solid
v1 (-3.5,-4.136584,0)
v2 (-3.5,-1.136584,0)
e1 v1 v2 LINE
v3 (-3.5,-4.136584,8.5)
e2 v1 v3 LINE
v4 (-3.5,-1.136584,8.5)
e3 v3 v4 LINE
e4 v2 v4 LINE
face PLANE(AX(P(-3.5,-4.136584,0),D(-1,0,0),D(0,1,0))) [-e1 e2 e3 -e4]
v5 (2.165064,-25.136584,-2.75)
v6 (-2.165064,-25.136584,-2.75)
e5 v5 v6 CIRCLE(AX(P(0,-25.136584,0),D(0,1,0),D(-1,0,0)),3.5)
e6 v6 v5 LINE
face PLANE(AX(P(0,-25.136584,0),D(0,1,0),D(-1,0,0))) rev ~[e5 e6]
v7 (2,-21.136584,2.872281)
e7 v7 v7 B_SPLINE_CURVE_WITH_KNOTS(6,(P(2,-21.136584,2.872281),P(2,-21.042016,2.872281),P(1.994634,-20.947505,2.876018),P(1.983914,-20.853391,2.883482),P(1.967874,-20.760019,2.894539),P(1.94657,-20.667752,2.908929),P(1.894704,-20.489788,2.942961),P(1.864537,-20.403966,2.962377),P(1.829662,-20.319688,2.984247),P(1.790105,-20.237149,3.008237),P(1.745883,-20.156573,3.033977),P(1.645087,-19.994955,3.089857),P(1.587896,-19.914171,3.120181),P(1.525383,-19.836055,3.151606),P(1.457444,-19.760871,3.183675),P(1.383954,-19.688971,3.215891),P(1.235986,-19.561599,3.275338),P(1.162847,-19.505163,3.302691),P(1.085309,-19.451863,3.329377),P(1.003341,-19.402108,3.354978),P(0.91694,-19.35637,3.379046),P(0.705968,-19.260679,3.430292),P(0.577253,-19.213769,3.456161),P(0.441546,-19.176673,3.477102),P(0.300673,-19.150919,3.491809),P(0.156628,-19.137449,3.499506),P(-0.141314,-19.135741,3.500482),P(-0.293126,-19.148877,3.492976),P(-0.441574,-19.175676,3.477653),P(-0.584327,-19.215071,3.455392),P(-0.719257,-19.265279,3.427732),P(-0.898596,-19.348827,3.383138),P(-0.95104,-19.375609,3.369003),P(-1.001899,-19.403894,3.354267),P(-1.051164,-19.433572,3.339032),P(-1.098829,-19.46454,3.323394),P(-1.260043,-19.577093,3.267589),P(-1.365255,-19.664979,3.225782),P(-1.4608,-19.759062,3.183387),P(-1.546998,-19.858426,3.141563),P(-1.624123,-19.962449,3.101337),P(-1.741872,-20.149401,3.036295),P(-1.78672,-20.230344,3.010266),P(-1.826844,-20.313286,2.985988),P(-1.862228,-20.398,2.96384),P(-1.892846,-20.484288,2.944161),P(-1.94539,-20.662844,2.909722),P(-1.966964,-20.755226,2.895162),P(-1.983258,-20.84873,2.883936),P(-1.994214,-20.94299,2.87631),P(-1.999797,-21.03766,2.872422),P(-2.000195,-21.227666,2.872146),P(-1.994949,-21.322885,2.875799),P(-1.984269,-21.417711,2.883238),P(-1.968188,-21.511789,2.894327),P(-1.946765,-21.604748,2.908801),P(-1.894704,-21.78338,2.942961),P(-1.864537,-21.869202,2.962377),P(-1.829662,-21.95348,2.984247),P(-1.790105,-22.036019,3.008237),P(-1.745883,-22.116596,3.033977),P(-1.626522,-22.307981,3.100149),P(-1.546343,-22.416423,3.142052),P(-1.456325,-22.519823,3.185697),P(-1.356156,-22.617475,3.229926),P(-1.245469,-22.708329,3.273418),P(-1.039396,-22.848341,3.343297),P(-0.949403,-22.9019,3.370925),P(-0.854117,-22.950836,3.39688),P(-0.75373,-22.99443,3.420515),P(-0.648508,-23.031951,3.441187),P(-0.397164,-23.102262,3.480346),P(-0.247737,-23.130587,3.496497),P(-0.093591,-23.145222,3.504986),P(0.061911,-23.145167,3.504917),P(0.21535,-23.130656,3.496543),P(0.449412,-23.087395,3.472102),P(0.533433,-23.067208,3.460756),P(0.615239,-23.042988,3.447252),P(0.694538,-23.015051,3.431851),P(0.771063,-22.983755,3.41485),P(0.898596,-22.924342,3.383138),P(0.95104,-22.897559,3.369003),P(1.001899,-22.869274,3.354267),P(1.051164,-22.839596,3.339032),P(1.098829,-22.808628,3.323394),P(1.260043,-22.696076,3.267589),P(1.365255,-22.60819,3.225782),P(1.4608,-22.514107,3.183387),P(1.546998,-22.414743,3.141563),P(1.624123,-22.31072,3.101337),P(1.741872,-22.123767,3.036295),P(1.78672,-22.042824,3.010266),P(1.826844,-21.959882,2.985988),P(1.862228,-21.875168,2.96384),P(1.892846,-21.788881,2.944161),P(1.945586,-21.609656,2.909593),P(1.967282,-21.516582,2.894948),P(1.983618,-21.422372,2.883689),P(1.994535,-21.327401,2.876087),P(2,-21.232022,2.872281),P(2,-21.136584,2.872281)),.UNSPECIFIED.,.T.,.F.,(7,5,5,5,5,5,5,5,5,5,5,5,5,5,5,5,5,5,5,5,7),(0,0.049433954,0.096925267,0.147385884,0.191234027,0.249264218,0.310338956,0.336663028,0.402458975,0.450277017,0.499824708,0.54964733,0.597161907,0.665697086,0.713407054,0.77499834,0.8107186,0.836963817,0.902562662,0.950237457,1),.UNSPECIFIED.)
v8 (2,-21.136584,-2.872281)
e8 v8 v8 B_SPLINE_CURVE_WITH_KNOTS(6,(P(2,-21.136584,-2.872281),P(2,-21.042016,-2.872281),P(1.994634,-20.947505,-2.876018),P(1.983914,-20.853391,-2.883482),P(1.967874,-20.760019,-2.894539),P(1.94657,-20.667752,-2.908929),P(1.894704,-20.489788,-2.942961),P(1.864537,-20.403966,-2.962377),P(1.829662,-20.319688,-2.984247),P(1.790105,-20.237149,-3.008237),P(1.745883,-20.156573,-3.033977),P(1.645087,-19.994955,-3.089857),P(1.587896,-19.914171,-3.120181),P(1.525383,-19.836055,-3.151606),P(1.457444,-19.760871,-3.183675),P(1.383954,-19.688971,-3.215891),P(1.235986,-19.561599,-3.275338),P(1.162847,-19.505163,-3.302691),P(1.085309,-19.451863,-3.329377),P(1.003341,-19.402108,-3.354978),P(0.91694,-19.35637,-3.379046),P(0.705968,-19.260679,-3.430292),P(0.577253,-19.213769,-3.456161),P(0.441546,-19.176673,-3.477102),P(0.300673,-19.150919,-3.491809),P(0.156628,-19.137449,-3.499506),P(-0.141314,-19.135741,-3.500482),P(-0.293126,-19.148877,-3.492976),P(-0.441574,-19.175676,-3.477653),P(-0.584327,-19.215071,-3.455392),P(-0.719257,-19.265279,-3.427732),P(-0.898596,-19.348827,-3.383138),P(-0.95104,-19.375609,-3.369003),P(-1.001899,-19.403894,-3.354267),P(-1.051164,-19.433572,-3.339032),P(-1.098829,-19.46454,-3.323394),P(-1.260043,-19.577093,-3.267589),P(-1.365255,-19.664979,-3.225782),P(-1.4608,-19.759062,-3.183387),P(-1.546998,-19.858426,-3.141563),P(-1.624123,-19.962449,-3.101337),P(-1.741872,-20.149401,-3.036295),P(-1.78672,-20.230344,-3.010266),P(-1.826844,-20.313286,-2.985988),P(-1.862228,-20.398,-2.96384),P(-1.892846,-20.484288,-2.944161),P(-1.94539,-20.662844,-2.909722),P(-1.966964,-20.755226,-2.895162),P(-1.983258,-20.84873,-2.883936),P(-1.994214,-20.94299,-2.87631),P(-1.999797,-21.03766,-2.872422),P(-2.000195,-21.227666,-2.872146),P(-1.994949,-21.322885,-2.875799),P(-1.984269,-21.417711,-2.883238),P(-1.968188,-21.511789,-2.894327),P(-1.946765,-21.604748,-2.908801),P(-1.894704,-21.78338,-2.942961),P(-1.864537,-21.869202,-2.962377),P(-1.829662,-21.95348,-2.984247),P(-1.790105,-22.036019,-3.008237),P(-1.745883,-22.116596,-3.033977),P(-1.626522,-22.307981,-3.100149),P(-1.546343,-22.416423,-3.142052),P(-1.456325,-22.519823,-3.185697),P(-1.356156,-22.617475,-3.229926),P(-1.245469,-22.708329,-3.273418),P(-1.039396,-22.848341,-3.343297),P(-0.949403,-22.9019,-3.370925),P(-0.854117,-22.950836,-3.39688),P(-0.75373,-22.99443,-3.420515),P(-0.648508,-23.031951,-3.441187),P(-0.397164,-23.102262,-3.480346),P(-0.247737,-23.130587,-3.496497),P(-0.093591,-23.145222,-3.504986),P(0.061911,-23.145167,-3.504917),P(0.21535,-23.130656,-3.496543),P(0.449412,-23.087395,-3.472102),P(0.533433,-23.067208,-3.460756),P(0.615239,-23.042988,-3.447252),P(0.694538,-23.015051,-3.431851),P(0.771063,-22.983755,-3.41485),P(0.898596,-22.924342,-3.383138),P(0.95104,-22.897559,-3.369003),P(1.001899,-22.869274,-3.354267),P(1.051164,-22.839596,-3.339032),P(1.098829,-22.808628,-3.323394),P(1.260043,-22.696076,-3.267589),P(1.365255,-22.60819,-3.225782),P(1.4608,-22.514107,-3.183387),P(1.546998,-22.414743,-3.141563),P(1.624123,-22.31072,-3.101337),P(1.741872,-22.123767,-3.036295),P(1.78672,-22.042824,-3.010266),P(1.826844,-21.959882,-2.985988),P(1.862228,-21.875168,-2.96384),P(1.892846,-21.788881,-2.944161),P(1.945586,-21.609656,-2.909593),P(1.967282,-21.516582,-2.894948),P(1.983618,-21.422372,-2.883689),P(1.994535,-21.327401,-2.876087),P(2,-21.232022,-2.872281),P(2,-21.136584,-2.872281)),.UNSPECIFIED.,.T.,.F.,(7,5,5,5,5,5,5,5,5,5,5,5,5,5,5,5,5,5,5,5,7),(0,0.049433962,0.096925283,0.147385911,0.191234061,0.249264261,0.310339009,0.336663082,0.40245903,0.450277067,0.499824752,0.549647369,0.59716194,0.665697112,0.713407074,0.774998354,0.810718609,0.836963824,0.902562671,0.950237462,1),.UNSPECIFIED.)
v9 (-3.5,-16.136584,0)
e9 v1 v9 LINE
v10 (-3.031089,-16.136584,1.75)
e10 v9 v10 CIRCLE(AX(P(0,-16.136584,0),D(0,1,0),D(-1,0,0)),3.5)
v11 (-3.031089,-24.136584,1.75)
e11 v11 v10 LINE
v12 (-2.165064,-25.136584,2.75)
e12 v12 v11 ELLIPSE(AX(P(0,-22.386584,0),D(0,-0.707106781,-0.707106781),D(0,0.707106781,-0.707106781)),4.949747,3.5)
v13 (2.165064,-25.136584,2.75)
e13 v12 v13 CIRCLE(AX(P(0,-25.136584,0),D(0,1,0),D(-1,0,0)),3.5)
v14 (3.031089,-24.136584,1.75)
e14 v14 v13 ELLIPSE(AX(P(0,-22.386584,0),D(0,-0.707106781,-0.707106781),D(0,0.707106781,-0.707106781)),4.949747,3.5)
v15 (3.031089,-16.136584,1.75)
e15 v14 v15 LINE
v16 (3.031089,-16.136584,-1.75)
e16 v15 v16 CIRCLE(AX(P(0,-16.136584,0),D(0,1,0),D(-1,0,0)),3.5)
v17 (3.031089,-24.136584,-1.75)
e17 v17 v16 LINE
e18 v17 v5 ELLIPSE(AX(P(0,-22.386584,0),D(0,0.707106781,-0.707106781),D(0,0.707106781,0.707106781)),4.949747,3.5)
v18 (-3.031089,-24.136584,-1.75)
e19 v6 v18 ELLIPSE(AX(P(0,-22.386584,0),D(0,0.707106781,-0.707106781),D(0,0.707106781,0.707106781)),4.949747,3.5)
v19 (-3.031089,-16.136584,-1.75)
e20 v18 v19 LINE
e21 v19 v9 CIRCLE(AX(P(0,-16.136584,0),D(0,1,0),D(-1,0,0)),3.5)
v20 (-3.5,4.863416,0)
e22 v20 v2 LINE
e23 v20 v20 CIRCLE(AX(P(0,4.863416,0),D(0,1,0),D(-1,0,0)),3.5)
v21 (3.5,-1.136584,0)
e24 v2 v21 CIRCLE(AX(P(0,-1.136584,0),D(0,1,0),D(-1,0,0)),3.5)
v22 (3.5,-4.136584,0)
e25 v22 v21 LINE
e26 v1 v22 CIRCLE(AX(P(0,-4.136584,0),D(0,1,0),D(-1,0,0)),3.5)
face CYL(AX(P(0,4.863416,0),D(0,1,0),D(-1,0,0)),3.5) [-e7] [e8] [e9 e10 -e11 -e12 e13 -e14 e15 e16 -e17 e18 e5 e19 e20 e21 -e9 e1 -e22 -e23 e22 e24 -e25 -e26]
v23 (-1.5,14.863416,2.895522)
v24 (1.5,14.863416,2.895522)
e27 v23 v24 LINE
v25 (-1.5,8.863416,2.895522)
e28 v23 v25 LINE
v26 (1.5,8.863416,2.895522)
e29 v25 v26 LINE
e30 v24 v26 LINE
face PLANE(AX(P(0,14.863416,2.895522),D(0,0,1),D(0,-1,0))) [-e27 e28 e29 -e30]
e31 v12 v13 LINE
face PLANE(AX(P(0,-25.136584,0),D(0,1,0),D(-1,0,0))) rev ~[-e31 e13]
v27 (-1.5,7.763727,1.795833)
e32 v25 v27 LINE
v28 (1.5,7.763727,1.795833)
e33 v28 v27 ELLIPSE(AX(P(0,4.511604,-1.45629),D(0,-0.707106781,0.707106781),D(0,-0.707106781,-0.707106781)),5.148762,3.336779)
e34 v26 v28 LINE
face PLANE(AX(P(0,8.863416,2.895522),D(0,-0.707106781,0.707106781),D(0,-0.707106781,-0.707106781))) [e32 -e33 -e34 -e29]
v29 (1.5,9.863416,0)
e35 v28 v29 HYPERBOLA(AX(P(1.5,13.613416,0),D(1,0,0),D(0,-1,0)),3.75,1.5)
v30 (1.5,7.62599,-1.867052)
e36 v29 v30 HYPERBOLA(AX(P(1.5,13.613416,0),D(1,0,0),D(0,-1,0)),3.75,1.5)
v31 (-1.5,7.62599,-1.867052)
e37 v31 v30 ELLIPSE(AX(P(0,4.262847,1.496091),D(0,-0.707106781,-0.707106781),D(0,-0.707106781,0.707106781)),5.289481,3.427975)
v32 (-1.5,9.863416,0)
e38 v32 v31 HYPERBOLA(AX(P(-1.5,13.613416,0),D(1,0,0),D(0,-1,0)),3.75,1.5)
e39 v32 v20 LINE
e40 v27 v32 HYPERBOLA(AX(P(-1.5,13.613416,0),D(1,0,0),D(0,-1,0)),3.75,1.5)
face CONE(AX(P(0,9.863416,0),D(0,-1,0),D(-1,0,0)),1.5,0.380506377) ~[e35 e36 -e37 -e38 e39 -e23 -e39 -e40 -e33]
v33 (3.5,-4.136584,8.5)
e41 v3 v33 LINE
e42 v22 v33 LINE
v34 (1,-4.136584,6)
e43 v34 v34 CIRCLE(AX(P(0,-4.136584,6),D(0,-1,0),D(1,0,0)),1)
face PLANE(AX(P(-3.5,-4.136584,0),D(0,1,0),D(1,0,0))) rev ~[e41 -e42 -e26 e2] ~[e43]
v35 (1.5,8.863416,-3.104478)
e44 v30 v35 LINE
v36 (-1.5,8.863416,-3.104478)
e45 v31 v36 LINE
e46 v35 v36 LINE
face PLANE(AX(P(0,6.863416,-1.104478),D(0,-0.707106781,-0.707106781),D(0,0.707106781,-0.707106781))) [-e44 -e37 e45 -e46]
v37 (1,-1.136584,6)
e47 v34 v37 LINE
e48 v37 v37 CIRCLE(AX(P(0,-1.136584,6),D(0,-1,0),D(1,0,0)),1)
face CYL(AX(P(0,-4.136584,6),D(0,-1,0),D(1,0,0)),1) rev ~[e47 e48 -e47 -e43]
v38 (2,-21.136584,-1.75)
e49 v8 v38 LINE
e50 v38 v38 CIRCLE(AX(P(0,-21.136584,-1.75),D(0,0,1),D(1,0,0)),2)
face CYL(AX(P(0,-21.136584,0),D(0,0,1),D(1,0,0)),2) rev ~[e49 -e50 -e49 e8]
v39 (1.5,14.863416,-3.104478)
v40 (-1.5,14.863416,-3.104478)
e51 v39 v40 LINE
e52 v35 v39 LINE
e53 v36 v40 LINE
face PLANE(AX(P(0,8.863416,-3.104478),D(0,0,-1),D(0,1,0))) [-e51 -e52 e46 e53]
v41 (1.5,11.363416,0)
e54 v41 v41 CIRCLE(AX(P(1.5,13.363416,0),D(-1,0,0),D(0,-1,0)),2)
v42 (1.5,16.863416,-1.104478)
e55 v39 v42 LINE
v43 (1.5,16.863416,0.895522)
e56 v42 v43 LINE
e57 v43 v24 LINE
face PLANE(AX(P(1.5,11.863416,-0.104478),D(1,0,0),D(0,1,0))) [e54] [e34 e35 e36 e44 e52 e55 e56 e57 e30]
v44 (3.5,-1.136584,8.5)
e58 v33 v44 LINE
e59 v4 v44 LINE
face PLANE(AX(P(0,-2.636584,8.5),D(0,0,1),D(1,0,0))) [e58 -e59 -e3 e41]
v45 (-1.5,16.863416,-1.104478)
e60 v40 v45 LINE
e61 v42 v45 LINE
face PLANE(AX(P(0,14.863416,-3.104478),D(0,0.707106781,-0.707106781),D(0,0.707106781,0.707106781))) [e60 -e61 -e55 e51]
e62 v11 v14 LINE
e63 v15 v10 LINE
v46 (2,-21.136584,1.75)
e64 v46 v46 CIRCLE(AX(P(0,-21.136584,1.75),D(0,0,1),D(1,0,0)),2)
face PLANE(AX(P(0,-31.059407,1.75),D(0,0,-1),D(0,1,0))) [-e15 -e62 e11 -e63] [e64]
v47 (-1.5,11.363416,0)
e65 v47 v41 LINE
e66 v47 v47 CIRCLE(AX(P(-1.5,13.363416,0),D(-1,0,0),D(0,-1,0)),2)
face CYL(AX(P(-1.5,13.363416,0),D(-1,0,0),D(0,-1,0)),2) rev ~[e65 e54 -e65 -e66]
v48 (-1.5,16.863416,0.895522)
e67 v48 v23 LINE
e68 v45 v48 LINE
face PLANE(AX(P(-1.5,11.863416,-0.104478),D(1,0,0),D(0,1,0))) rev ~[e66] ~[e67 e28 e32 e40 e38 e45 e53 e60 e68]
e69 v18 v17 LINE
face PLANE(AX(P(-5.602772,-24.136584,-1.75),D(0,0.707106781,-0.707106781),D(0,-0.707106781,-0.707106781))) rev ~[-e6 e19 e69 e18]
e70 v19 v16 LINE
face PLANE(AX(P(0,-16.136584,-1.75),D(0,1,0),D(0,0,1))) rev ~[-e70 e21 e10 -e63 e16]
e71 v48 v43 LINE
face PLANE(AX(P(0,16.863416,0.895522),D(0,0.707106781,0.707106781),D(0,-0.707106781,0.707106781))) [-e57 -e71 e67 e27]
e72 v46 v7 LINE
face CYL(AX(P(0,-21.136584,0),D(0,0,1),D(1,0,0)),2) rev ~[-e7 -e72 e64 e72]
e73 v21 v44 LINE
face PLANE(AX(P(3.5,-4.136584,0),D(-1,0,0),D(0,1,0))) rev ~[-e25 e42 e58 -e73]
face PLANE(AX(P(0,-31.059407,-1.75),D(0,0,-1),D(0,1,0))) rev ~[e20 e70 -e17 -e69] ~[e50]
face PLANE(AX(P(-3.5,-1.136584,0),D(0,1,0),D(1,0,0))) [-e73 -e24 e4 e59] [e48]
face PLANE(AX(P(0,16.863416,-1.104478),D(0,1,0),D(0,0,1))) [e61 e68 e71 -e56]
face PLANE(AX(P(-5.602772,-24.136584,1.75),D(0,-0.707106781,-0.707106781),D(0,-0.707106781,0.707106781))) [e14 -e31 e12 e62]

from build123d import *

# Parameters (mm, degrees)
F1_DEPTH     = 1.5
F2_R         = 2
F3_DEPTH     = 3.001
F6_DEPTH     = 30
F7_W         = 14.9228225192
F7_H         = 3.5
F8_DEPTH     = 12.5
F9_W         = 7
F9_H         = 3
F10_DEPTH    = 8.5
F11_R        = 2
F12_DEPTH    = 12.5
F13_R        = 1
F14_DEPTH    = 21.001
F15_T1_DEPTH = 11.2055438024


# Not quite as in the source:
# - a fillet or chamfer that OpenCascade refuses, or shapes differently, is made with other operations: its cross-section is extruded or revolved along the edge and cut away or added


with BuildPart() as f1:
    # F0 (on Right) → F1 (new body, symmetric)
    with BuildSketch(Plane.YZ):
        Polygon((16.8634157784, -1.1044778318), (16.8634157784, 0.8955221682), (14.8634157784, 2.8955221682), (8.8634157784, 2.8955221682), (6.8634157784, 0.8955221682), (6.8634157784, -1.1044778318), (8.8634157784, -3.1044778318), (14.8634157784, -3.1044778318), align=None)
    extrude(amount=F1_DEPTH, both=True)

    # F2 (on face) → F3 (cut, through all)
    with BuildSketch(Plane(origin=(-1.5, 0, 0), x_dir=(0, -1, 0), z_dir=(-1, 0, 0))):
        with Locations((-13.3634157784, 0)):
            Circle(F2_R)
    extrude(amount=-F3_DEPTH, mode=Mode.SUBTRACT)

    # F4 (on Top) → F5 (revolve)
    with BuildSketch(Plane.XY):
        Polygon((0, 4.8634157784), (0, 9.8634157784), (-1.5, 9.8634157784), (-3.5, 4.8634157784), align=None)
    revolve(axis=Axis((0, 7.3634157784, 0), (0, 1, 0)))

    # F6 (add): a face of the model
    f6_faces = [f1.faces().sort_by_distance(p)[0] for p in [
        (0, 4.8634157784, 0),
    ]]
    extrude(f6_faces, amount=F6_DEPTH)

    # F7 (on Right) → F8 (cut, symmetric)
    with BuildSketch(Plane.YZ):
        with Locations((-23.5979954812, 0)):
            Rectangle(F7_W, F7_H)
    extrude(amount=F8_DEPTH, both=True, mode=Mode.SUBTRACT)

    # F9 (on Top) → F10 (join)
    with BuildSketch(Plane.XY):
        with Locations((0, -2.6365842216)):
            Rectangle(F9_W, F9_H)
    extrude(amount=F10_DEPTH)

    # F11 (on Top) → F12 (cut, symmetric)
    with BuildSketch(Plane.XY):
        with Locations((0, -21.1365842216)):
            Circle(F11_R)
    extrude(amount=F12_DEPTH, both=True, mode=Mode.SUBTRACT)

    # F13 (on face) → F14 (cut, through all)
    with BuildSketch(Plane.XZ.offset(4.1365842216)):
        with Locations((0, 6)):
            Circle(F13_R)
    extrude(amount=-F14_DEPTH, mode=Mode.SUBTRACT)

    # F15: chamfer of 1 on 2 edges, made by hand

    # F15_s2 → F15_t1 (cut)
    with BuildSketch(Plane.YZ.offset(-5.6027719012)):
        Polygon((-24.1365842216, -1.75), (-25.1365842216, -2.75), (-25.1365842216, -1.75), align=None)
        Polygon((-24.1365842216, 1.75), (-25.1365842216, 2.75), (-25.1365842216, 1.75), align=None)
    extrude(amount=F15_T1_DEPTH, mode=Mode.SUBTRACT)


solid = f1.part
